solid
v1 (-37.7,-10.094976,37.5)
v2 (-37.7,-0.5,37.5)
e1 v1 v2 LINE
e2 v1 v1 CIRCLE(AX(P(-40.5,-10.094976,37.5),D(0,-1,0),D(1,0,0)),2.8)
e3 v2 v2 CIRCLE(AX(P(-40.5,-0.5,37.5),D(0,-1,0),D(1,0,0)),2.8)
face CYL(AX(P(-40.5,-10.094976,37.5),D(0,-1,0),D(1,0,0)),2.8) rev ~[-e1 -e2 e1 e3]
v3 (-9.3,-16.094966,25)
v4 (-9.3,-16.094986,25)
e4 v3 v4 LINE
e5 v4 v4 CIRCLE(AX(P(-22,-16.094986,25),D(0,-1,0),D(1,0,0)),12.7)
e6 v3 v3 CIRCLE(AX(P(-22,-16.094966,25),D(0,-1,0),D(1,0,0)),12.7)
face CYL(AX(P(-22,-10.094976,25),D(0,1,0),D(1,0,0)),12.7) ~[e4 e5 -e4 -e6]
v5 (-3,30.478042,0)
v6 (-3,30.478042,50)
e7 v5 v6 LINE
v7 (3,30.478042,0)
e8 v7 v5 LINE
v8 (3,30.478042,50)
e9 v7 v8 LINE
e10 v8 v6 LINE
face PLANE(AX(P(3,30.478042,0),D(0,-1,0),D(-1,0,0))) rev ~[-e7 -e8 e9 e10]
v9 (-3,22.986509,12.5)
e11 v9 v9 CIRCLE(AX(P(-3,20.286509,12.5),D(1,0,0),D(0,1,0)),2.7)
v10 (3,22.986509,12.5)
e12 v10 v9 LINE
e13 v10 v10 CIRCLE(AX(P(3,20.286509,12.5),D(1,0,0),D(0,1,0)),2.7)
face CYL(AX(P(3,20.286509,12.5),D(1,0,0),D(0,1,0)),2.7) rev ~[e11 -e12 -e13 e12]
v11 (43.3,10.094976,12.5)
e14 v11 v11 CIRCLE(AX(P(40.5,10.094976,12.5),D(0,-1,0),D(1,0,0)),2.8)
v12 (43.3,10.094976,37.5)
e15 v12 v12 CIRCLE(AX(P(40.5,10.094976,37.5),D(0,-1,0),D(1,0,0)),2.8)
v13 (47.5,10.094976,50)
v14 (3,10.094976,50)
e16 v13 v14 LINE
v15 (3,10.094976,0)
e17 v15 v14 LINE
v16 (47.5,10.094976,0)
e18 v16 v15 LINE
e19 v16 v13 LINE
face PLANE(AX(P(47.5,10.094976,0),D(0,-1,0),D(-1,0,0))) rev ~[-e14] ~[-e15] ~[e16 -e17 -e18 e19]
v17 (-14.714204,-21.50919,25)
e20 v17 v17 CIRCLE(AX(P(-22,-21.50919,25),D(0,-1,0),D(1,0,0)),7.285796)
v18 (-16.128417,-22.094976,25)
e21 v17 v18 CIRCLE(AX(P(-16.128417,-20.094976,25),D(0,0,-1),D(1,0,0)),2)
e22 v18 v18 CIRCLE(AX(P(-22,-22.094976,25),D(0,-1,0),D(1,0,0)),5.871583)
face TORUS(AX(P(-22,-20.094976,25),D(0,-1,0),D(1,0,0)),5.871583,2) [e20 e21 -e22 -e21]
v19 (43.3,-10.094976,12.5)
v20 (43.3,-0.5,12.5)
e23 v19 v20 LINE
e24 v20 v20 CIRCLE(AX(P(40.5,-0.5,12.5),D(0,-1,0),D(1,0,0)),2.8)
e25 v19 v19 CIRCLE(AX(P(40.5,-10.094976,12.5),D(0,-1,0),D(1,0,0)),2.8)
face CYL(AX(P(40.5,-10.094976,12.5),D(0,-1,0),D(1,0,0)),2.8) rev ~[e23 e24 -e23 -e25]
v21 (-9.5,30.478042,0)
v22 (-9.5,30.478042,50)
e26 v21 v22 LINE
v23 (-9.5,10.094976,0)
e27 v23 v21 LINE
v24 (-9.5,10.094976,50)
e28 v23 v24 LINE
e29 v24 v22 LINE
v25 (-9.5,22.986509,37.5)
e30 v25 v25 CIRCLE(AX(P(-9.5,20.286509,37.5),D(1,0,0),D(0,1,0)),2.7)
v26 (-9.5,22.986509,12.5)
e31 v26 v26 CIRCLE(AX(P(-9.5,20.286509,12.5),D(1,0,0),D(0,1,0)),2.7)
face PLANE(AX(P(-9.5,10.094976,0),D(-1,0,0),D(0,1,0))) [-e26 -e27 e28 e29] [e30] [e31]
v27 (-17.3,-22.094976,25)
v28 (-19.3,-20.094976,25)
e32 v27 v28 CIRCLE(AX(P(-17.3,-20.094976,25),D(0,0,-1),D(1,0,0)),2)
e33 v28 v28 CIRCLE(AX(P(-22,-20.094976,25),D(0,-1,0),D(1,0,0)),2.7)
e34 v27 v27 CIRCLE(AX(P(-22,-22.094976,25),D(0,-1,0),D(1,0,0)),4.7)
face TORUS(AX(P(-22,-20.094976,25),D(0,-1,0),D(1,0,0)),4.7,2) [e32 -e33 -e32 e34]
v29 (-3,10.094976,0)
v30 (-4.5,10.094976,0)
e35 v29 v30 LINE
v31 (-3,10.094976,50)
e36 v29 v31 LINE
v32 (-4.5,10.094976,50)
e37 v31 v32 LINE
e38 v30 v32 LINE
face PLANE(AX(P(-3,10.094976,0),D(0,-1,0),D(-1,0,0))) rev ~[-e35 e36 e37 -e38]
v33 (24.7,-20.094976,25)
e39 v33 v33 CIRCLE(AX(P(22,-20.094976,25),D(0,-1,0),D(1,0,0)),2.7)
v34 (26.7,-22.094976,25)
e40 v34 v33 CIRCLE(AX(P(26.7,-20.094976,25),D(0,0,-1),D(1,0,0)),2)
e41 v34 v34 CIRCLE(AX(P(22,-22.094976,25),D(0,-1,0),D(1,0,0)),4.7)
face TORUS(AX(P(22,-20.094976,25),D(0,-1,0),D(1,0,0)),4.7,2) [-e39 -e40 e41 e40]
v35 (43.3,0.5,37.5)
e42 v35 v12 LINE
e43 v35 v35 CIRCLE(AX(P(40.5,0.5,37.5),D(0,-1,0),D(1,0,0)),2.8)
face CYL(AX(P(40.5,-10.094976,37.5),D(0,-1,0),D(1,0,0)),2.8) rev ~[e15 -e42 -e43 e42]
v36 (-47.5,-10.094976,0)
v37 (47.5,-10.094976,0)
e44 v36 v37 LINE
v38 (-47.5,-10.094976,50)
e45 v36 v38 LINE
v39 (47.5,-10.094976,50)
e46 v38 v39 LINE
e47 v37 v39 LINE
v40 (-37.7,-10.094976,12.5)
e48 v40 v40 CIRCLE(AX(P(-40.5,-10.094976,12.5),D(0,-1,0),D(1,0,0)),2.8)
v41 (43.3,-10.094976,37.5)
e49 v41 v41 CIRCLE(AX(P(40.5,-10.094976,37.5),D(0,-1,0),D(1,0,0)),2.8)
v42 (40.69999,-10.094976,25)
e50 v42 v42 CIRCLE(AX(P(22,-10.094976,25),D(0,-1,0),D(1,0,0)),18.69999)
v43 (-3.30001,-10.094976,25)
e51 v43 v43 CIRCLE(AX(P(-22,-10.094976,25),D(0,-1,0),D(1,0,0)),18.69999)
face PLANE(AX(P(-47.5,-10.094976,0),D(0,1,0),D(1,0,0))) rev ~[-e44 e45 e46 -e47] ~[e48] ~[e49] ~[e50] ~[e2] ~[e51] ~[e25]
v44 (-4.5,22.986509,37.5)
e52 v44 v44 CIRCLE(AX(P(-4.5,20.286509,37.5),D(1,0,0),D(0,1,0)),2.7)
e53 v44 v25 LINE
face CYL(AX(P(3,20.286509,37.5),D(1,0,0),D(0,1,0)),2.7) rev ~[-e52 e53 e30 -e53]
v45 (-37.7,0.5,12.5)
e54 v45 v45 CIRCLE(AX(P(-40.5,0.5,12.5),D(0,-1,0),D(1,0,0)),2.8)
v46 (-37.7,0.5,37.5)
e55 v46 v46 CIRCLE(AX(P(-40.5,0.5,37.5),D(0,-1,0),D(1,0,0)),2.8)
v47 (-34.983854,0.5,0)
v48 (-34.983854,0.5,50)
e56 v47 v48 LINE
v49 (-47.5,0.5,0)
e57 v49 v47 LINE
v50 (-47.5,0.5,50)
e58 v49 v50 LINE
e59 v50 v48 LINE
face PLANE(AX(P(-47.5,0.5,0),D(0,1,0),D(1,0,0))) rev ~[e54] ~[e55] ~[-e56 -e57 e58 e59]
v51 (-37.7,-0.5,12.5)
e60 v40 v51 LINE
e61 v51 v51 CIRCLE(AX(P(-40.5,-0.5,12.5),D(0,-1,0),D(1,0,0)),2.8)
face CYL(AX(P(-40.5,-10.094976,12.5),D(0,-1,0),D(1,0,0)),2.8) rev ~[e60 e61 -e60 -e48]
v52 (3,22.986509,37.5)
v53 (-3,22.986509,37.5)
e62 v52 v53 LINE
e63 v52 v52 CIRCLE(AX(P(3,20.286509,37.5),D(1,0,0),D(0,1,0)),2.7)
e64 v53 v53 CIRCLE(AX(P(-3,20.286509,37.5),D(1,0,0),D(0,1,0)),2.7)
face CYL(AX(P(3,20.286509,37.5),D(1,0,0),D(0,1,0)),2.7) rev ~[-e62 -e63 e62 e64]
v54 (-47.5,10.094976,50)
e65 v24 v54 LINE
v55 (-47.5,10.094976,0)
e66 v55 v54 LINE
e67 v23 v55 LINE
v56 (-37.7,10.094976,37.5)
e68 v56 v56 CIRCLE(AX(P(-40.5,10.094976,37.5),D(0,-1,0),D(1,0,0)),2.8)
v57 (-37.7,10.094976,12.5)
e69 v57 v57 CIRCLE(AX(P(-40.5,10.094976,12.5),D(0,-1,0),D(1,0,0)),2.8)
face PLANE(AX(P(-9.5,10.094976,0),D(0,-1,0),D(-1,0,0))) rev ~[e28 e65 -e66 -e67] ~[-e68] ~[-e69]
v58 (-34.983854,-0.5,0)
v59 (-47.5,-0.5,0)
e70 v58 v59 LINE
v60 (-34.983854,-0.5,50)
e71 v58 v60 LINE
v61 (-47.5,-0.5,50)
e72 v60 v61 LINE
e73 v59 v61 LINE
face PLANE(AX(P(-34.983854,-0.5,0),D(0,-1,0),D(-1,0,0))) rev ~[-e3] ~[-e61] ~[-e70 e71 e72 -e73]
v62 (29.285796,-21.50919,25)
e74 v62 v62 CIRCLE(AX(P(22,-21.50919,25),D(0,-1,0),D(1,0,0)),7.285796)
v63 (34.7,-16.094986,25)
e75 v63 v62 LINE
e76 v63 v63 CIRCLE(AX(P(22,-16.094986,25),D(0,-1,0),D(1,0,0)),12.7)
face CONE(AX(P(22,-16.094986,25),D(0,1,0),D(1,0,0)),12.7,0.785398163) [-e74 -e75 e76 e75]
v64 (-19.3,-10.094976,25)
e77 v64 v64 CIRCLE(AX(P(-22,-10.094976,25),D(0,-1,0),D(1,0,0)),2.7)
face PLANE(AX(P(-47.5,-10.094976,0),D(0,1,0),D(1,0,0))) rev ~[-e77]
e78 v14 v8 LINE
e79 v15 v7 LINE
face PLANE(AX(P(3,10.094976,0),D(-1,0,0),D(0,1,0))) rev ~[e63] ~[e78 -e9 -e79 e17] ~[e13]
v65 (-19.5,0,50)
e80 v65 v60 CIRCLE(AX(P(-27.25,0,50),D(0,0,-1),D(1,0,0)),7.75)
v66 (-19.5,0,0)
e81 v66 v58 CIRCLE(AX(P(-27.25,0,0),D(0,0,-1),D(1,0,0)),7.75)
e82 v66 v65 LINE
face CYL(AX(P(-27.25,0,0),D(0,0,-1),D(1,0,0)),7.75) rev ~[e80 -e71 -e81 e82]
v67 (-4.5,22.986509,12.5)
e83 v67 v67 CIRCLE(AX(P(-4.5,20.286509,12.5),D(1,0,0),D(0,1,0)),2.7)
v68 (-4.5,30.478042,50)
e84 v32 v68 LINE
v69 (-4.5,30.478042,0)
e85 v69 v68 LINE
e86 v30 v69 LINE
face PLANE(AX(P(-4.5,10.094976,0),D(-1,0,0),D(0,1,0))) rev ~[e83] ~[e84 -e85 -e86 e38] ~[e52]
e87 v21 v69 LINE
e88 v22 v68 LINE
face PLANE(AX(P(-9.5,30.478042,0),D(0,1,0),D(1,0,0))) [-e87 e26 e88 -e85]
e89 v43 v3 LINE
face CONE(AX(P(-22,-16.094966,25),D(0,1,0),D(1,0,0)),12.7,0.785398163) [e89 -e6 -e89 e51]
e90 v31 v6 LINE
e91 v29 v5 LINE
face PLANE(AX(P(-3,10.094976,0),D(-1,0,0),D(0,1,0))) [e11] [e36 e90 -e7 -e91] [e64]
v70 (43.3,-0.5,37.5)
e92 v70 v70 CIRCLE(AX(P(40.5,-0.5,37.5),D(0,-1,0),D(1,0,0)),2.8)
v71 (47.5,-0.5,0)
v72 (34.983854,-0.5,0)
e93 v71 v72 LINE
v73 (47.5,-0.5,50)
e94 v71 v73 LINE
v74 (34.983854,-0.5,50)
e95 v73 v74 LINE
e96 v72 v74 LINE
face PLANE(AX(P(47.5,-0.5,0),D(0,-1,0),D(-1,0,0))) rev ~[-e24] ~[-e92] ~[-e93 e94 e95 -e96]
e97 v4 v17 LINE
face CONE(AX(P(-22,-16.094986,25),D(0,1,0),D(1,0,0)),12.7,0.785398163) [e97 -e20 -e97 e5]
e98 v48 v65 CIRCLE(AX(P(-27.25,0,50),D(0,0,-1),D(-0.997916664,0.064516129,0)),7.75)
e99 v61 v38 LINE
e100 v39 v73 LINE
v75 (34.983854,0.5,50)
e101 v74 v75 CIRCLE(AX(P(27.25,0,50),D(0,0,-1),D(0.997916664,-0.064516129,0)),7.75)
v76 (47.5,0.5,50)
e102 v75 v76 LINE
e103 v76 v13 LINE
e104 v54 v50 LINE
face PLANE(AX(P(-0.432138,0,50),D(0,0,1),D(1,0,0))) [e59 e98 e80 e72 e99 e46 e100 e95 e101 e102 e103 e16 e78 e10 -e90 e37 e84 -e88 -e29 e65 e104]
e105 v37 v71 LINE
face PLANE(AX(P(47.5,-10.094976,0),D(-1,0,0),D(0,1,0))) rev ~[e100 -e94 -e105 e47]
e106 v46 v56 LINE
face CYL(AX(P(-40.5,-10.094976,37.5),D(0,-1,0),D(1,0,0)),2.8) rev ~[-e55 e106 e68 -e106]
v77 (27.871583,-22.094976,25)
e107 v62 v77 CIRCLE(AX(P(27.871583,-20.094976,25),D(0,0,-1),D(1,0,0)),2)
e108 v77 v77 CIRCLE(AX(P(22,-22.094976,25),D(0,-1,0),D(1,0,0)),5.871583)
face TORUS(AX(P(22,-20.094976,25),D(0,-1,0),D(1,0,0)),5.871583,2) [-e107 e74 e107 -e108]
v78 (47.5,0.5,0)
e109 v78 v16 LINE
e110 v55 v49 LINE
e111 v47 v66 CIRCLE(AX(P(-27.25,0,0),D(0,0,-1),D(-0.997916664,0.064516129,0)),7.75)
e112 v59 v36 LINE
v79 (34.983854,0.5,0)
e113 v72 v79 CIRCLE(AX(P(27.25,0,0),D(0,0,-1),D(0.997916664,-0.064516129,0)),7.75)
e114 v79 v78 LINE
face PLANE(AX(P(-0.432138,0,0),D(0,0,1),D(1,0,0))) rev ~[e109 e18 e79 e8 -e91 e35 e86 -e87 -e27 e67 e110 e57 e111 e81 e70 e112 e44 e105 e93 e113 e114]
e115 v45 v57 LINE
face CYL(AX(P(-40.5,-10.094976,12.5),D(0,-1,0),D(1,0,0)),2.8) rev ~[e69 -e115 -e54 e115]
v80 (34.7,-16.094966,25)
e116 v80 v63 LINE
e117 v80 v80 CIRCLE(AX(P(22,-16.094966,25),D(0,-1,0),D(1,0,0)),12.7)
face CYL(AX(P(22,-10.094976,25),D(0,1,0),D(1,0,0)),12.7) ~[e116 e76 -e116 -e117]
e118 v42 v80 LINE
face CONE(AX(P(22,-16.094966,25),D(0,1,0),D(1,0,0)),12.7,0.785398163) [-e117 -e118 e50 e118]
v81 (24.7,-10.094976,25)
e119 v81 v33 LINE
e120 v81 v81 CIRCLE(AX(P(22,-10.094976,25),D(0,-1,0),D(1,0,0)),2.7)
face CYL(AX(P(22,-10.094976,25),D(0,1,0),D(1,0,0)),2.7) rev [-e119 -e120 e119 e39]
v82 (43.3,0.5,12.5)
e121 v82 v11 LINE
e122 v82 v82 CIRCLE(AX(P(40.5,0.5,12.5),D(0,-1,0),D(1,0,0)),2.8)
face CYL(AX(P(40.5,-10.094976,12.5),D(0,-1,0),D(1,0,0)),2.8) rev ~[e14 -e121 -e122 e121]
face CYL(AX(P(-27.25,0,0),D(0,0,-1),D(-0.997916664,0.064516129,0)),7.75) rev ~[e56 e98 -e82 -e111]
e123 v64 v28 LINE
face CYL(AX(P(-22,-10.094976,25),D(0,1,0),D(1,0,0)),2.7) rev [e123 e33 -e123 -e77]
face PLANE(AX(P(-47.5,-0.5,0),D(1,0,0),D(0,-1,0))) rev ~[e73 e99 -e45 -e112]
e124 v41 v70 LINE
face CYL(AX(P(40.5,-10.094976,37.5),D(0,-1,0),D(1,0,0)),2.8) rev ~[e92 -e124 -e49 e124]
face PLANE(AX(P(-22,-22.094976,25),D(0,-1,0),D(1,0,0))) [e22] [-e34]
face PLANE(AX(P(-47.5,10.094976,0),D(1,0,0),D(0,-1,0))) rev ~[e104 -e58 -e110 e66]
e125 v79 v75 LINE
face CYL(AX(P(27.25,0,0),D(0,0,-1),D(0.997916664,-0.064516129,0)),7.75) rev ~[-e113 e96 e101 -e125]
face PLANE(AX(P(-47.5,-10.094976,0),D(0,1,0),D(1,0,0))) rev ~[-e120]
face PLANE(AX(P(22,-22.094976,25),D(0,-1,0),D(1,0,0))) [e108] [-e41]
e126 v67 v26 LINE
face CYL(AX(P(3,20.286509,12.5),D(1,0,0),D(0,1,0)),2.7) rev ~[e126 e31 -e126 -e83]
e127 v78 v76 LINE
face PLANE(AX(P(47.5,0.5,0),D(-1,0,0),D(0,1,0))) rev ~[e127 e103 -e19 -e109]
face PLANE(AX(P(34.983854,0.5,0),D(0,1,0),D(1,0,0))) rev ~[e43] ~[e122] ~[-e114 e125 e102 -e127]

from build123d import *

# Parameters (mm, degrees)
F0_W     = 5
F0_H     = 20.3830654012
F0_W_2   = 3
F1_DEPTH = 50
F2_R     = 2.7
F3_DEPTH = 25
F4_R     = 12.7
F4_R_2   = 2.7
F5_DEPTH = 12
F6_SIZE  = 5.99999
F4_R_3   = 2.8
F7_DEPTH = 25
F8_R     = 2


# Not quite as in the source:
# - a fillet or chamfer is up to 0.001 mm smaller than in the source, because OpenCascade refuses the exact size


with BuildPart() as f1:
    # F0 (on Top) → F1 (new body)
    with BuildSketch(Plane.XY):
        with BuildLine():
            ThreePointArc((-34.9838541491, 0.5), (-26.9998696897, 7.7459624856), (-19.5, 0))
            ThreePointArc((-19.5, 0), (-26.9998696897, -7.7459624856), (-34.9838541491, -0.5))
            Line((-34.9838541491, -0.5), (-47.5, -0.5))
            Line((-47.5, -0.5), (-47.5, -10.0949762179))
            Line((-47.5, -10.0949762179), (47.5, -10.0949762179))
            Line((47.5, -10.0949762179), (47.5, -0.5))
            Line((47.5, -0.5), (34.9838541491, -0.5))
            ThreePointArc((34.9838541491, -0.5), (19.5, 0), (34.9838541491, 0.5))
            Line((34.9838541491, 0.5), (47.5, 0.5))
            Line((47.5, 0.5), (47.5, 10.0949762179))
            Line((47.5, 10.0949762179), (9.5, 10.0949762179))
            Line((9.5, 10.0949762179), (4.5, 10.0949762179))
            Line((4.5, 10.0949762179), (3, 10.0949762179))
            Line((3, 10.0949762179), (0, 10.0949762179))
            Line((0, 10.0949762179), (-3, 10.0949762179))
            Line((-3, 10.0949762179), (-4.5, 10.0949762179))
            Line((-4.5, 10.0949762179), (-9.5, 10.0949762179))
            Line((-9.5, 10.0949762179), (-47.5, 10.0949762179))
            Line((-47.5, 10.0949762179), (-47.5, 0.5))
            Line((-47.5, 0.5), (-34.9838541491, 0.5))
        make_face()
        with Locations((-7, 20.2865089185)):
            Rectangle(F0_W, F0_H)
        with Locations((-1.5, 20.2865089185)):
            Rectangle(F0_W_2, F0_H)
        with Locations((1.5, 20.2865089185)):
            Rectangle(F0_W_2, F0_H)
    extrude(amount=F1_DEPTH)

    # F2 (on face) → F3 (cut)
    with BuildSketch(Plane.YZ.offset(3)):
        with Locations((20.2865089185, 37.5)):
            Circle(F2_R)
        with Locations((20.2865089185, 12.5)):
            Circle(F2_R)
    extrude(amount=-F3_DEPTH, mode=Mode.SUBTRACT)

    # F4 (on face) → F5 (join)
    with BuildSketch(Plane.XZ.offset(10.0949762179)):
        with Locations((-22, 25)):
            Circle(F4_R)
        with Locations((-22, 25)):
            Circle(F4_R_2, mode=Mode.SUBTRACT)
        with Locations((22, 25)):
            Circle(F4_R)
        with Locations((22, 25)):
            Circle(F4_R_2, mode=Mode.SUBTRACT)
    extrude(amount=F5_DEPTH)

    # F6 (size 6 in the source; OpenCascade refuses exactly that, so slightly less here)
    f6_edges = [f1.edges().sort_by_distance(p)[0] for p in [
        (-34.7, -10.094976, 25),
        (-34.7, -22.094976, 25),
        (9.3, -22.094976, 25),
        (9.3, -10.094976, 25),
    ]]
    chamfer(f6_edges, length=F6_SIZE)

    # F4 (on face) → F7 (cut)
    with BuildSketch(Plane.XZ.offset(10.0949762179)):
        with Locations((-40.5, 37.5)):
            Circle(F4_R_3)
        with Locations((-40.5, 12.5)):
            Circle(F4_R_3)
        with Locations((40.5, 37.5)):
            Circle(F4_R_3)
        with Locations((40.5, 12.5)):
            Circle(F4_R_3)
    extrude(amount=-F7_DEPTH, mode=Mode.SUBTRACT)

    # F8
    f8_edges = [f1.edges().sort_by_distance(p)[0] for p in [
        (-28.70001, -22.094976, 25),
        (-24.7, -22.094976, 25),
        (15.29999, -22.094976, 25),
        (19.3, -22.094976, 25),
    ]]
    fillet(f8_edges, radius=F8_R)


solid = f1.part
